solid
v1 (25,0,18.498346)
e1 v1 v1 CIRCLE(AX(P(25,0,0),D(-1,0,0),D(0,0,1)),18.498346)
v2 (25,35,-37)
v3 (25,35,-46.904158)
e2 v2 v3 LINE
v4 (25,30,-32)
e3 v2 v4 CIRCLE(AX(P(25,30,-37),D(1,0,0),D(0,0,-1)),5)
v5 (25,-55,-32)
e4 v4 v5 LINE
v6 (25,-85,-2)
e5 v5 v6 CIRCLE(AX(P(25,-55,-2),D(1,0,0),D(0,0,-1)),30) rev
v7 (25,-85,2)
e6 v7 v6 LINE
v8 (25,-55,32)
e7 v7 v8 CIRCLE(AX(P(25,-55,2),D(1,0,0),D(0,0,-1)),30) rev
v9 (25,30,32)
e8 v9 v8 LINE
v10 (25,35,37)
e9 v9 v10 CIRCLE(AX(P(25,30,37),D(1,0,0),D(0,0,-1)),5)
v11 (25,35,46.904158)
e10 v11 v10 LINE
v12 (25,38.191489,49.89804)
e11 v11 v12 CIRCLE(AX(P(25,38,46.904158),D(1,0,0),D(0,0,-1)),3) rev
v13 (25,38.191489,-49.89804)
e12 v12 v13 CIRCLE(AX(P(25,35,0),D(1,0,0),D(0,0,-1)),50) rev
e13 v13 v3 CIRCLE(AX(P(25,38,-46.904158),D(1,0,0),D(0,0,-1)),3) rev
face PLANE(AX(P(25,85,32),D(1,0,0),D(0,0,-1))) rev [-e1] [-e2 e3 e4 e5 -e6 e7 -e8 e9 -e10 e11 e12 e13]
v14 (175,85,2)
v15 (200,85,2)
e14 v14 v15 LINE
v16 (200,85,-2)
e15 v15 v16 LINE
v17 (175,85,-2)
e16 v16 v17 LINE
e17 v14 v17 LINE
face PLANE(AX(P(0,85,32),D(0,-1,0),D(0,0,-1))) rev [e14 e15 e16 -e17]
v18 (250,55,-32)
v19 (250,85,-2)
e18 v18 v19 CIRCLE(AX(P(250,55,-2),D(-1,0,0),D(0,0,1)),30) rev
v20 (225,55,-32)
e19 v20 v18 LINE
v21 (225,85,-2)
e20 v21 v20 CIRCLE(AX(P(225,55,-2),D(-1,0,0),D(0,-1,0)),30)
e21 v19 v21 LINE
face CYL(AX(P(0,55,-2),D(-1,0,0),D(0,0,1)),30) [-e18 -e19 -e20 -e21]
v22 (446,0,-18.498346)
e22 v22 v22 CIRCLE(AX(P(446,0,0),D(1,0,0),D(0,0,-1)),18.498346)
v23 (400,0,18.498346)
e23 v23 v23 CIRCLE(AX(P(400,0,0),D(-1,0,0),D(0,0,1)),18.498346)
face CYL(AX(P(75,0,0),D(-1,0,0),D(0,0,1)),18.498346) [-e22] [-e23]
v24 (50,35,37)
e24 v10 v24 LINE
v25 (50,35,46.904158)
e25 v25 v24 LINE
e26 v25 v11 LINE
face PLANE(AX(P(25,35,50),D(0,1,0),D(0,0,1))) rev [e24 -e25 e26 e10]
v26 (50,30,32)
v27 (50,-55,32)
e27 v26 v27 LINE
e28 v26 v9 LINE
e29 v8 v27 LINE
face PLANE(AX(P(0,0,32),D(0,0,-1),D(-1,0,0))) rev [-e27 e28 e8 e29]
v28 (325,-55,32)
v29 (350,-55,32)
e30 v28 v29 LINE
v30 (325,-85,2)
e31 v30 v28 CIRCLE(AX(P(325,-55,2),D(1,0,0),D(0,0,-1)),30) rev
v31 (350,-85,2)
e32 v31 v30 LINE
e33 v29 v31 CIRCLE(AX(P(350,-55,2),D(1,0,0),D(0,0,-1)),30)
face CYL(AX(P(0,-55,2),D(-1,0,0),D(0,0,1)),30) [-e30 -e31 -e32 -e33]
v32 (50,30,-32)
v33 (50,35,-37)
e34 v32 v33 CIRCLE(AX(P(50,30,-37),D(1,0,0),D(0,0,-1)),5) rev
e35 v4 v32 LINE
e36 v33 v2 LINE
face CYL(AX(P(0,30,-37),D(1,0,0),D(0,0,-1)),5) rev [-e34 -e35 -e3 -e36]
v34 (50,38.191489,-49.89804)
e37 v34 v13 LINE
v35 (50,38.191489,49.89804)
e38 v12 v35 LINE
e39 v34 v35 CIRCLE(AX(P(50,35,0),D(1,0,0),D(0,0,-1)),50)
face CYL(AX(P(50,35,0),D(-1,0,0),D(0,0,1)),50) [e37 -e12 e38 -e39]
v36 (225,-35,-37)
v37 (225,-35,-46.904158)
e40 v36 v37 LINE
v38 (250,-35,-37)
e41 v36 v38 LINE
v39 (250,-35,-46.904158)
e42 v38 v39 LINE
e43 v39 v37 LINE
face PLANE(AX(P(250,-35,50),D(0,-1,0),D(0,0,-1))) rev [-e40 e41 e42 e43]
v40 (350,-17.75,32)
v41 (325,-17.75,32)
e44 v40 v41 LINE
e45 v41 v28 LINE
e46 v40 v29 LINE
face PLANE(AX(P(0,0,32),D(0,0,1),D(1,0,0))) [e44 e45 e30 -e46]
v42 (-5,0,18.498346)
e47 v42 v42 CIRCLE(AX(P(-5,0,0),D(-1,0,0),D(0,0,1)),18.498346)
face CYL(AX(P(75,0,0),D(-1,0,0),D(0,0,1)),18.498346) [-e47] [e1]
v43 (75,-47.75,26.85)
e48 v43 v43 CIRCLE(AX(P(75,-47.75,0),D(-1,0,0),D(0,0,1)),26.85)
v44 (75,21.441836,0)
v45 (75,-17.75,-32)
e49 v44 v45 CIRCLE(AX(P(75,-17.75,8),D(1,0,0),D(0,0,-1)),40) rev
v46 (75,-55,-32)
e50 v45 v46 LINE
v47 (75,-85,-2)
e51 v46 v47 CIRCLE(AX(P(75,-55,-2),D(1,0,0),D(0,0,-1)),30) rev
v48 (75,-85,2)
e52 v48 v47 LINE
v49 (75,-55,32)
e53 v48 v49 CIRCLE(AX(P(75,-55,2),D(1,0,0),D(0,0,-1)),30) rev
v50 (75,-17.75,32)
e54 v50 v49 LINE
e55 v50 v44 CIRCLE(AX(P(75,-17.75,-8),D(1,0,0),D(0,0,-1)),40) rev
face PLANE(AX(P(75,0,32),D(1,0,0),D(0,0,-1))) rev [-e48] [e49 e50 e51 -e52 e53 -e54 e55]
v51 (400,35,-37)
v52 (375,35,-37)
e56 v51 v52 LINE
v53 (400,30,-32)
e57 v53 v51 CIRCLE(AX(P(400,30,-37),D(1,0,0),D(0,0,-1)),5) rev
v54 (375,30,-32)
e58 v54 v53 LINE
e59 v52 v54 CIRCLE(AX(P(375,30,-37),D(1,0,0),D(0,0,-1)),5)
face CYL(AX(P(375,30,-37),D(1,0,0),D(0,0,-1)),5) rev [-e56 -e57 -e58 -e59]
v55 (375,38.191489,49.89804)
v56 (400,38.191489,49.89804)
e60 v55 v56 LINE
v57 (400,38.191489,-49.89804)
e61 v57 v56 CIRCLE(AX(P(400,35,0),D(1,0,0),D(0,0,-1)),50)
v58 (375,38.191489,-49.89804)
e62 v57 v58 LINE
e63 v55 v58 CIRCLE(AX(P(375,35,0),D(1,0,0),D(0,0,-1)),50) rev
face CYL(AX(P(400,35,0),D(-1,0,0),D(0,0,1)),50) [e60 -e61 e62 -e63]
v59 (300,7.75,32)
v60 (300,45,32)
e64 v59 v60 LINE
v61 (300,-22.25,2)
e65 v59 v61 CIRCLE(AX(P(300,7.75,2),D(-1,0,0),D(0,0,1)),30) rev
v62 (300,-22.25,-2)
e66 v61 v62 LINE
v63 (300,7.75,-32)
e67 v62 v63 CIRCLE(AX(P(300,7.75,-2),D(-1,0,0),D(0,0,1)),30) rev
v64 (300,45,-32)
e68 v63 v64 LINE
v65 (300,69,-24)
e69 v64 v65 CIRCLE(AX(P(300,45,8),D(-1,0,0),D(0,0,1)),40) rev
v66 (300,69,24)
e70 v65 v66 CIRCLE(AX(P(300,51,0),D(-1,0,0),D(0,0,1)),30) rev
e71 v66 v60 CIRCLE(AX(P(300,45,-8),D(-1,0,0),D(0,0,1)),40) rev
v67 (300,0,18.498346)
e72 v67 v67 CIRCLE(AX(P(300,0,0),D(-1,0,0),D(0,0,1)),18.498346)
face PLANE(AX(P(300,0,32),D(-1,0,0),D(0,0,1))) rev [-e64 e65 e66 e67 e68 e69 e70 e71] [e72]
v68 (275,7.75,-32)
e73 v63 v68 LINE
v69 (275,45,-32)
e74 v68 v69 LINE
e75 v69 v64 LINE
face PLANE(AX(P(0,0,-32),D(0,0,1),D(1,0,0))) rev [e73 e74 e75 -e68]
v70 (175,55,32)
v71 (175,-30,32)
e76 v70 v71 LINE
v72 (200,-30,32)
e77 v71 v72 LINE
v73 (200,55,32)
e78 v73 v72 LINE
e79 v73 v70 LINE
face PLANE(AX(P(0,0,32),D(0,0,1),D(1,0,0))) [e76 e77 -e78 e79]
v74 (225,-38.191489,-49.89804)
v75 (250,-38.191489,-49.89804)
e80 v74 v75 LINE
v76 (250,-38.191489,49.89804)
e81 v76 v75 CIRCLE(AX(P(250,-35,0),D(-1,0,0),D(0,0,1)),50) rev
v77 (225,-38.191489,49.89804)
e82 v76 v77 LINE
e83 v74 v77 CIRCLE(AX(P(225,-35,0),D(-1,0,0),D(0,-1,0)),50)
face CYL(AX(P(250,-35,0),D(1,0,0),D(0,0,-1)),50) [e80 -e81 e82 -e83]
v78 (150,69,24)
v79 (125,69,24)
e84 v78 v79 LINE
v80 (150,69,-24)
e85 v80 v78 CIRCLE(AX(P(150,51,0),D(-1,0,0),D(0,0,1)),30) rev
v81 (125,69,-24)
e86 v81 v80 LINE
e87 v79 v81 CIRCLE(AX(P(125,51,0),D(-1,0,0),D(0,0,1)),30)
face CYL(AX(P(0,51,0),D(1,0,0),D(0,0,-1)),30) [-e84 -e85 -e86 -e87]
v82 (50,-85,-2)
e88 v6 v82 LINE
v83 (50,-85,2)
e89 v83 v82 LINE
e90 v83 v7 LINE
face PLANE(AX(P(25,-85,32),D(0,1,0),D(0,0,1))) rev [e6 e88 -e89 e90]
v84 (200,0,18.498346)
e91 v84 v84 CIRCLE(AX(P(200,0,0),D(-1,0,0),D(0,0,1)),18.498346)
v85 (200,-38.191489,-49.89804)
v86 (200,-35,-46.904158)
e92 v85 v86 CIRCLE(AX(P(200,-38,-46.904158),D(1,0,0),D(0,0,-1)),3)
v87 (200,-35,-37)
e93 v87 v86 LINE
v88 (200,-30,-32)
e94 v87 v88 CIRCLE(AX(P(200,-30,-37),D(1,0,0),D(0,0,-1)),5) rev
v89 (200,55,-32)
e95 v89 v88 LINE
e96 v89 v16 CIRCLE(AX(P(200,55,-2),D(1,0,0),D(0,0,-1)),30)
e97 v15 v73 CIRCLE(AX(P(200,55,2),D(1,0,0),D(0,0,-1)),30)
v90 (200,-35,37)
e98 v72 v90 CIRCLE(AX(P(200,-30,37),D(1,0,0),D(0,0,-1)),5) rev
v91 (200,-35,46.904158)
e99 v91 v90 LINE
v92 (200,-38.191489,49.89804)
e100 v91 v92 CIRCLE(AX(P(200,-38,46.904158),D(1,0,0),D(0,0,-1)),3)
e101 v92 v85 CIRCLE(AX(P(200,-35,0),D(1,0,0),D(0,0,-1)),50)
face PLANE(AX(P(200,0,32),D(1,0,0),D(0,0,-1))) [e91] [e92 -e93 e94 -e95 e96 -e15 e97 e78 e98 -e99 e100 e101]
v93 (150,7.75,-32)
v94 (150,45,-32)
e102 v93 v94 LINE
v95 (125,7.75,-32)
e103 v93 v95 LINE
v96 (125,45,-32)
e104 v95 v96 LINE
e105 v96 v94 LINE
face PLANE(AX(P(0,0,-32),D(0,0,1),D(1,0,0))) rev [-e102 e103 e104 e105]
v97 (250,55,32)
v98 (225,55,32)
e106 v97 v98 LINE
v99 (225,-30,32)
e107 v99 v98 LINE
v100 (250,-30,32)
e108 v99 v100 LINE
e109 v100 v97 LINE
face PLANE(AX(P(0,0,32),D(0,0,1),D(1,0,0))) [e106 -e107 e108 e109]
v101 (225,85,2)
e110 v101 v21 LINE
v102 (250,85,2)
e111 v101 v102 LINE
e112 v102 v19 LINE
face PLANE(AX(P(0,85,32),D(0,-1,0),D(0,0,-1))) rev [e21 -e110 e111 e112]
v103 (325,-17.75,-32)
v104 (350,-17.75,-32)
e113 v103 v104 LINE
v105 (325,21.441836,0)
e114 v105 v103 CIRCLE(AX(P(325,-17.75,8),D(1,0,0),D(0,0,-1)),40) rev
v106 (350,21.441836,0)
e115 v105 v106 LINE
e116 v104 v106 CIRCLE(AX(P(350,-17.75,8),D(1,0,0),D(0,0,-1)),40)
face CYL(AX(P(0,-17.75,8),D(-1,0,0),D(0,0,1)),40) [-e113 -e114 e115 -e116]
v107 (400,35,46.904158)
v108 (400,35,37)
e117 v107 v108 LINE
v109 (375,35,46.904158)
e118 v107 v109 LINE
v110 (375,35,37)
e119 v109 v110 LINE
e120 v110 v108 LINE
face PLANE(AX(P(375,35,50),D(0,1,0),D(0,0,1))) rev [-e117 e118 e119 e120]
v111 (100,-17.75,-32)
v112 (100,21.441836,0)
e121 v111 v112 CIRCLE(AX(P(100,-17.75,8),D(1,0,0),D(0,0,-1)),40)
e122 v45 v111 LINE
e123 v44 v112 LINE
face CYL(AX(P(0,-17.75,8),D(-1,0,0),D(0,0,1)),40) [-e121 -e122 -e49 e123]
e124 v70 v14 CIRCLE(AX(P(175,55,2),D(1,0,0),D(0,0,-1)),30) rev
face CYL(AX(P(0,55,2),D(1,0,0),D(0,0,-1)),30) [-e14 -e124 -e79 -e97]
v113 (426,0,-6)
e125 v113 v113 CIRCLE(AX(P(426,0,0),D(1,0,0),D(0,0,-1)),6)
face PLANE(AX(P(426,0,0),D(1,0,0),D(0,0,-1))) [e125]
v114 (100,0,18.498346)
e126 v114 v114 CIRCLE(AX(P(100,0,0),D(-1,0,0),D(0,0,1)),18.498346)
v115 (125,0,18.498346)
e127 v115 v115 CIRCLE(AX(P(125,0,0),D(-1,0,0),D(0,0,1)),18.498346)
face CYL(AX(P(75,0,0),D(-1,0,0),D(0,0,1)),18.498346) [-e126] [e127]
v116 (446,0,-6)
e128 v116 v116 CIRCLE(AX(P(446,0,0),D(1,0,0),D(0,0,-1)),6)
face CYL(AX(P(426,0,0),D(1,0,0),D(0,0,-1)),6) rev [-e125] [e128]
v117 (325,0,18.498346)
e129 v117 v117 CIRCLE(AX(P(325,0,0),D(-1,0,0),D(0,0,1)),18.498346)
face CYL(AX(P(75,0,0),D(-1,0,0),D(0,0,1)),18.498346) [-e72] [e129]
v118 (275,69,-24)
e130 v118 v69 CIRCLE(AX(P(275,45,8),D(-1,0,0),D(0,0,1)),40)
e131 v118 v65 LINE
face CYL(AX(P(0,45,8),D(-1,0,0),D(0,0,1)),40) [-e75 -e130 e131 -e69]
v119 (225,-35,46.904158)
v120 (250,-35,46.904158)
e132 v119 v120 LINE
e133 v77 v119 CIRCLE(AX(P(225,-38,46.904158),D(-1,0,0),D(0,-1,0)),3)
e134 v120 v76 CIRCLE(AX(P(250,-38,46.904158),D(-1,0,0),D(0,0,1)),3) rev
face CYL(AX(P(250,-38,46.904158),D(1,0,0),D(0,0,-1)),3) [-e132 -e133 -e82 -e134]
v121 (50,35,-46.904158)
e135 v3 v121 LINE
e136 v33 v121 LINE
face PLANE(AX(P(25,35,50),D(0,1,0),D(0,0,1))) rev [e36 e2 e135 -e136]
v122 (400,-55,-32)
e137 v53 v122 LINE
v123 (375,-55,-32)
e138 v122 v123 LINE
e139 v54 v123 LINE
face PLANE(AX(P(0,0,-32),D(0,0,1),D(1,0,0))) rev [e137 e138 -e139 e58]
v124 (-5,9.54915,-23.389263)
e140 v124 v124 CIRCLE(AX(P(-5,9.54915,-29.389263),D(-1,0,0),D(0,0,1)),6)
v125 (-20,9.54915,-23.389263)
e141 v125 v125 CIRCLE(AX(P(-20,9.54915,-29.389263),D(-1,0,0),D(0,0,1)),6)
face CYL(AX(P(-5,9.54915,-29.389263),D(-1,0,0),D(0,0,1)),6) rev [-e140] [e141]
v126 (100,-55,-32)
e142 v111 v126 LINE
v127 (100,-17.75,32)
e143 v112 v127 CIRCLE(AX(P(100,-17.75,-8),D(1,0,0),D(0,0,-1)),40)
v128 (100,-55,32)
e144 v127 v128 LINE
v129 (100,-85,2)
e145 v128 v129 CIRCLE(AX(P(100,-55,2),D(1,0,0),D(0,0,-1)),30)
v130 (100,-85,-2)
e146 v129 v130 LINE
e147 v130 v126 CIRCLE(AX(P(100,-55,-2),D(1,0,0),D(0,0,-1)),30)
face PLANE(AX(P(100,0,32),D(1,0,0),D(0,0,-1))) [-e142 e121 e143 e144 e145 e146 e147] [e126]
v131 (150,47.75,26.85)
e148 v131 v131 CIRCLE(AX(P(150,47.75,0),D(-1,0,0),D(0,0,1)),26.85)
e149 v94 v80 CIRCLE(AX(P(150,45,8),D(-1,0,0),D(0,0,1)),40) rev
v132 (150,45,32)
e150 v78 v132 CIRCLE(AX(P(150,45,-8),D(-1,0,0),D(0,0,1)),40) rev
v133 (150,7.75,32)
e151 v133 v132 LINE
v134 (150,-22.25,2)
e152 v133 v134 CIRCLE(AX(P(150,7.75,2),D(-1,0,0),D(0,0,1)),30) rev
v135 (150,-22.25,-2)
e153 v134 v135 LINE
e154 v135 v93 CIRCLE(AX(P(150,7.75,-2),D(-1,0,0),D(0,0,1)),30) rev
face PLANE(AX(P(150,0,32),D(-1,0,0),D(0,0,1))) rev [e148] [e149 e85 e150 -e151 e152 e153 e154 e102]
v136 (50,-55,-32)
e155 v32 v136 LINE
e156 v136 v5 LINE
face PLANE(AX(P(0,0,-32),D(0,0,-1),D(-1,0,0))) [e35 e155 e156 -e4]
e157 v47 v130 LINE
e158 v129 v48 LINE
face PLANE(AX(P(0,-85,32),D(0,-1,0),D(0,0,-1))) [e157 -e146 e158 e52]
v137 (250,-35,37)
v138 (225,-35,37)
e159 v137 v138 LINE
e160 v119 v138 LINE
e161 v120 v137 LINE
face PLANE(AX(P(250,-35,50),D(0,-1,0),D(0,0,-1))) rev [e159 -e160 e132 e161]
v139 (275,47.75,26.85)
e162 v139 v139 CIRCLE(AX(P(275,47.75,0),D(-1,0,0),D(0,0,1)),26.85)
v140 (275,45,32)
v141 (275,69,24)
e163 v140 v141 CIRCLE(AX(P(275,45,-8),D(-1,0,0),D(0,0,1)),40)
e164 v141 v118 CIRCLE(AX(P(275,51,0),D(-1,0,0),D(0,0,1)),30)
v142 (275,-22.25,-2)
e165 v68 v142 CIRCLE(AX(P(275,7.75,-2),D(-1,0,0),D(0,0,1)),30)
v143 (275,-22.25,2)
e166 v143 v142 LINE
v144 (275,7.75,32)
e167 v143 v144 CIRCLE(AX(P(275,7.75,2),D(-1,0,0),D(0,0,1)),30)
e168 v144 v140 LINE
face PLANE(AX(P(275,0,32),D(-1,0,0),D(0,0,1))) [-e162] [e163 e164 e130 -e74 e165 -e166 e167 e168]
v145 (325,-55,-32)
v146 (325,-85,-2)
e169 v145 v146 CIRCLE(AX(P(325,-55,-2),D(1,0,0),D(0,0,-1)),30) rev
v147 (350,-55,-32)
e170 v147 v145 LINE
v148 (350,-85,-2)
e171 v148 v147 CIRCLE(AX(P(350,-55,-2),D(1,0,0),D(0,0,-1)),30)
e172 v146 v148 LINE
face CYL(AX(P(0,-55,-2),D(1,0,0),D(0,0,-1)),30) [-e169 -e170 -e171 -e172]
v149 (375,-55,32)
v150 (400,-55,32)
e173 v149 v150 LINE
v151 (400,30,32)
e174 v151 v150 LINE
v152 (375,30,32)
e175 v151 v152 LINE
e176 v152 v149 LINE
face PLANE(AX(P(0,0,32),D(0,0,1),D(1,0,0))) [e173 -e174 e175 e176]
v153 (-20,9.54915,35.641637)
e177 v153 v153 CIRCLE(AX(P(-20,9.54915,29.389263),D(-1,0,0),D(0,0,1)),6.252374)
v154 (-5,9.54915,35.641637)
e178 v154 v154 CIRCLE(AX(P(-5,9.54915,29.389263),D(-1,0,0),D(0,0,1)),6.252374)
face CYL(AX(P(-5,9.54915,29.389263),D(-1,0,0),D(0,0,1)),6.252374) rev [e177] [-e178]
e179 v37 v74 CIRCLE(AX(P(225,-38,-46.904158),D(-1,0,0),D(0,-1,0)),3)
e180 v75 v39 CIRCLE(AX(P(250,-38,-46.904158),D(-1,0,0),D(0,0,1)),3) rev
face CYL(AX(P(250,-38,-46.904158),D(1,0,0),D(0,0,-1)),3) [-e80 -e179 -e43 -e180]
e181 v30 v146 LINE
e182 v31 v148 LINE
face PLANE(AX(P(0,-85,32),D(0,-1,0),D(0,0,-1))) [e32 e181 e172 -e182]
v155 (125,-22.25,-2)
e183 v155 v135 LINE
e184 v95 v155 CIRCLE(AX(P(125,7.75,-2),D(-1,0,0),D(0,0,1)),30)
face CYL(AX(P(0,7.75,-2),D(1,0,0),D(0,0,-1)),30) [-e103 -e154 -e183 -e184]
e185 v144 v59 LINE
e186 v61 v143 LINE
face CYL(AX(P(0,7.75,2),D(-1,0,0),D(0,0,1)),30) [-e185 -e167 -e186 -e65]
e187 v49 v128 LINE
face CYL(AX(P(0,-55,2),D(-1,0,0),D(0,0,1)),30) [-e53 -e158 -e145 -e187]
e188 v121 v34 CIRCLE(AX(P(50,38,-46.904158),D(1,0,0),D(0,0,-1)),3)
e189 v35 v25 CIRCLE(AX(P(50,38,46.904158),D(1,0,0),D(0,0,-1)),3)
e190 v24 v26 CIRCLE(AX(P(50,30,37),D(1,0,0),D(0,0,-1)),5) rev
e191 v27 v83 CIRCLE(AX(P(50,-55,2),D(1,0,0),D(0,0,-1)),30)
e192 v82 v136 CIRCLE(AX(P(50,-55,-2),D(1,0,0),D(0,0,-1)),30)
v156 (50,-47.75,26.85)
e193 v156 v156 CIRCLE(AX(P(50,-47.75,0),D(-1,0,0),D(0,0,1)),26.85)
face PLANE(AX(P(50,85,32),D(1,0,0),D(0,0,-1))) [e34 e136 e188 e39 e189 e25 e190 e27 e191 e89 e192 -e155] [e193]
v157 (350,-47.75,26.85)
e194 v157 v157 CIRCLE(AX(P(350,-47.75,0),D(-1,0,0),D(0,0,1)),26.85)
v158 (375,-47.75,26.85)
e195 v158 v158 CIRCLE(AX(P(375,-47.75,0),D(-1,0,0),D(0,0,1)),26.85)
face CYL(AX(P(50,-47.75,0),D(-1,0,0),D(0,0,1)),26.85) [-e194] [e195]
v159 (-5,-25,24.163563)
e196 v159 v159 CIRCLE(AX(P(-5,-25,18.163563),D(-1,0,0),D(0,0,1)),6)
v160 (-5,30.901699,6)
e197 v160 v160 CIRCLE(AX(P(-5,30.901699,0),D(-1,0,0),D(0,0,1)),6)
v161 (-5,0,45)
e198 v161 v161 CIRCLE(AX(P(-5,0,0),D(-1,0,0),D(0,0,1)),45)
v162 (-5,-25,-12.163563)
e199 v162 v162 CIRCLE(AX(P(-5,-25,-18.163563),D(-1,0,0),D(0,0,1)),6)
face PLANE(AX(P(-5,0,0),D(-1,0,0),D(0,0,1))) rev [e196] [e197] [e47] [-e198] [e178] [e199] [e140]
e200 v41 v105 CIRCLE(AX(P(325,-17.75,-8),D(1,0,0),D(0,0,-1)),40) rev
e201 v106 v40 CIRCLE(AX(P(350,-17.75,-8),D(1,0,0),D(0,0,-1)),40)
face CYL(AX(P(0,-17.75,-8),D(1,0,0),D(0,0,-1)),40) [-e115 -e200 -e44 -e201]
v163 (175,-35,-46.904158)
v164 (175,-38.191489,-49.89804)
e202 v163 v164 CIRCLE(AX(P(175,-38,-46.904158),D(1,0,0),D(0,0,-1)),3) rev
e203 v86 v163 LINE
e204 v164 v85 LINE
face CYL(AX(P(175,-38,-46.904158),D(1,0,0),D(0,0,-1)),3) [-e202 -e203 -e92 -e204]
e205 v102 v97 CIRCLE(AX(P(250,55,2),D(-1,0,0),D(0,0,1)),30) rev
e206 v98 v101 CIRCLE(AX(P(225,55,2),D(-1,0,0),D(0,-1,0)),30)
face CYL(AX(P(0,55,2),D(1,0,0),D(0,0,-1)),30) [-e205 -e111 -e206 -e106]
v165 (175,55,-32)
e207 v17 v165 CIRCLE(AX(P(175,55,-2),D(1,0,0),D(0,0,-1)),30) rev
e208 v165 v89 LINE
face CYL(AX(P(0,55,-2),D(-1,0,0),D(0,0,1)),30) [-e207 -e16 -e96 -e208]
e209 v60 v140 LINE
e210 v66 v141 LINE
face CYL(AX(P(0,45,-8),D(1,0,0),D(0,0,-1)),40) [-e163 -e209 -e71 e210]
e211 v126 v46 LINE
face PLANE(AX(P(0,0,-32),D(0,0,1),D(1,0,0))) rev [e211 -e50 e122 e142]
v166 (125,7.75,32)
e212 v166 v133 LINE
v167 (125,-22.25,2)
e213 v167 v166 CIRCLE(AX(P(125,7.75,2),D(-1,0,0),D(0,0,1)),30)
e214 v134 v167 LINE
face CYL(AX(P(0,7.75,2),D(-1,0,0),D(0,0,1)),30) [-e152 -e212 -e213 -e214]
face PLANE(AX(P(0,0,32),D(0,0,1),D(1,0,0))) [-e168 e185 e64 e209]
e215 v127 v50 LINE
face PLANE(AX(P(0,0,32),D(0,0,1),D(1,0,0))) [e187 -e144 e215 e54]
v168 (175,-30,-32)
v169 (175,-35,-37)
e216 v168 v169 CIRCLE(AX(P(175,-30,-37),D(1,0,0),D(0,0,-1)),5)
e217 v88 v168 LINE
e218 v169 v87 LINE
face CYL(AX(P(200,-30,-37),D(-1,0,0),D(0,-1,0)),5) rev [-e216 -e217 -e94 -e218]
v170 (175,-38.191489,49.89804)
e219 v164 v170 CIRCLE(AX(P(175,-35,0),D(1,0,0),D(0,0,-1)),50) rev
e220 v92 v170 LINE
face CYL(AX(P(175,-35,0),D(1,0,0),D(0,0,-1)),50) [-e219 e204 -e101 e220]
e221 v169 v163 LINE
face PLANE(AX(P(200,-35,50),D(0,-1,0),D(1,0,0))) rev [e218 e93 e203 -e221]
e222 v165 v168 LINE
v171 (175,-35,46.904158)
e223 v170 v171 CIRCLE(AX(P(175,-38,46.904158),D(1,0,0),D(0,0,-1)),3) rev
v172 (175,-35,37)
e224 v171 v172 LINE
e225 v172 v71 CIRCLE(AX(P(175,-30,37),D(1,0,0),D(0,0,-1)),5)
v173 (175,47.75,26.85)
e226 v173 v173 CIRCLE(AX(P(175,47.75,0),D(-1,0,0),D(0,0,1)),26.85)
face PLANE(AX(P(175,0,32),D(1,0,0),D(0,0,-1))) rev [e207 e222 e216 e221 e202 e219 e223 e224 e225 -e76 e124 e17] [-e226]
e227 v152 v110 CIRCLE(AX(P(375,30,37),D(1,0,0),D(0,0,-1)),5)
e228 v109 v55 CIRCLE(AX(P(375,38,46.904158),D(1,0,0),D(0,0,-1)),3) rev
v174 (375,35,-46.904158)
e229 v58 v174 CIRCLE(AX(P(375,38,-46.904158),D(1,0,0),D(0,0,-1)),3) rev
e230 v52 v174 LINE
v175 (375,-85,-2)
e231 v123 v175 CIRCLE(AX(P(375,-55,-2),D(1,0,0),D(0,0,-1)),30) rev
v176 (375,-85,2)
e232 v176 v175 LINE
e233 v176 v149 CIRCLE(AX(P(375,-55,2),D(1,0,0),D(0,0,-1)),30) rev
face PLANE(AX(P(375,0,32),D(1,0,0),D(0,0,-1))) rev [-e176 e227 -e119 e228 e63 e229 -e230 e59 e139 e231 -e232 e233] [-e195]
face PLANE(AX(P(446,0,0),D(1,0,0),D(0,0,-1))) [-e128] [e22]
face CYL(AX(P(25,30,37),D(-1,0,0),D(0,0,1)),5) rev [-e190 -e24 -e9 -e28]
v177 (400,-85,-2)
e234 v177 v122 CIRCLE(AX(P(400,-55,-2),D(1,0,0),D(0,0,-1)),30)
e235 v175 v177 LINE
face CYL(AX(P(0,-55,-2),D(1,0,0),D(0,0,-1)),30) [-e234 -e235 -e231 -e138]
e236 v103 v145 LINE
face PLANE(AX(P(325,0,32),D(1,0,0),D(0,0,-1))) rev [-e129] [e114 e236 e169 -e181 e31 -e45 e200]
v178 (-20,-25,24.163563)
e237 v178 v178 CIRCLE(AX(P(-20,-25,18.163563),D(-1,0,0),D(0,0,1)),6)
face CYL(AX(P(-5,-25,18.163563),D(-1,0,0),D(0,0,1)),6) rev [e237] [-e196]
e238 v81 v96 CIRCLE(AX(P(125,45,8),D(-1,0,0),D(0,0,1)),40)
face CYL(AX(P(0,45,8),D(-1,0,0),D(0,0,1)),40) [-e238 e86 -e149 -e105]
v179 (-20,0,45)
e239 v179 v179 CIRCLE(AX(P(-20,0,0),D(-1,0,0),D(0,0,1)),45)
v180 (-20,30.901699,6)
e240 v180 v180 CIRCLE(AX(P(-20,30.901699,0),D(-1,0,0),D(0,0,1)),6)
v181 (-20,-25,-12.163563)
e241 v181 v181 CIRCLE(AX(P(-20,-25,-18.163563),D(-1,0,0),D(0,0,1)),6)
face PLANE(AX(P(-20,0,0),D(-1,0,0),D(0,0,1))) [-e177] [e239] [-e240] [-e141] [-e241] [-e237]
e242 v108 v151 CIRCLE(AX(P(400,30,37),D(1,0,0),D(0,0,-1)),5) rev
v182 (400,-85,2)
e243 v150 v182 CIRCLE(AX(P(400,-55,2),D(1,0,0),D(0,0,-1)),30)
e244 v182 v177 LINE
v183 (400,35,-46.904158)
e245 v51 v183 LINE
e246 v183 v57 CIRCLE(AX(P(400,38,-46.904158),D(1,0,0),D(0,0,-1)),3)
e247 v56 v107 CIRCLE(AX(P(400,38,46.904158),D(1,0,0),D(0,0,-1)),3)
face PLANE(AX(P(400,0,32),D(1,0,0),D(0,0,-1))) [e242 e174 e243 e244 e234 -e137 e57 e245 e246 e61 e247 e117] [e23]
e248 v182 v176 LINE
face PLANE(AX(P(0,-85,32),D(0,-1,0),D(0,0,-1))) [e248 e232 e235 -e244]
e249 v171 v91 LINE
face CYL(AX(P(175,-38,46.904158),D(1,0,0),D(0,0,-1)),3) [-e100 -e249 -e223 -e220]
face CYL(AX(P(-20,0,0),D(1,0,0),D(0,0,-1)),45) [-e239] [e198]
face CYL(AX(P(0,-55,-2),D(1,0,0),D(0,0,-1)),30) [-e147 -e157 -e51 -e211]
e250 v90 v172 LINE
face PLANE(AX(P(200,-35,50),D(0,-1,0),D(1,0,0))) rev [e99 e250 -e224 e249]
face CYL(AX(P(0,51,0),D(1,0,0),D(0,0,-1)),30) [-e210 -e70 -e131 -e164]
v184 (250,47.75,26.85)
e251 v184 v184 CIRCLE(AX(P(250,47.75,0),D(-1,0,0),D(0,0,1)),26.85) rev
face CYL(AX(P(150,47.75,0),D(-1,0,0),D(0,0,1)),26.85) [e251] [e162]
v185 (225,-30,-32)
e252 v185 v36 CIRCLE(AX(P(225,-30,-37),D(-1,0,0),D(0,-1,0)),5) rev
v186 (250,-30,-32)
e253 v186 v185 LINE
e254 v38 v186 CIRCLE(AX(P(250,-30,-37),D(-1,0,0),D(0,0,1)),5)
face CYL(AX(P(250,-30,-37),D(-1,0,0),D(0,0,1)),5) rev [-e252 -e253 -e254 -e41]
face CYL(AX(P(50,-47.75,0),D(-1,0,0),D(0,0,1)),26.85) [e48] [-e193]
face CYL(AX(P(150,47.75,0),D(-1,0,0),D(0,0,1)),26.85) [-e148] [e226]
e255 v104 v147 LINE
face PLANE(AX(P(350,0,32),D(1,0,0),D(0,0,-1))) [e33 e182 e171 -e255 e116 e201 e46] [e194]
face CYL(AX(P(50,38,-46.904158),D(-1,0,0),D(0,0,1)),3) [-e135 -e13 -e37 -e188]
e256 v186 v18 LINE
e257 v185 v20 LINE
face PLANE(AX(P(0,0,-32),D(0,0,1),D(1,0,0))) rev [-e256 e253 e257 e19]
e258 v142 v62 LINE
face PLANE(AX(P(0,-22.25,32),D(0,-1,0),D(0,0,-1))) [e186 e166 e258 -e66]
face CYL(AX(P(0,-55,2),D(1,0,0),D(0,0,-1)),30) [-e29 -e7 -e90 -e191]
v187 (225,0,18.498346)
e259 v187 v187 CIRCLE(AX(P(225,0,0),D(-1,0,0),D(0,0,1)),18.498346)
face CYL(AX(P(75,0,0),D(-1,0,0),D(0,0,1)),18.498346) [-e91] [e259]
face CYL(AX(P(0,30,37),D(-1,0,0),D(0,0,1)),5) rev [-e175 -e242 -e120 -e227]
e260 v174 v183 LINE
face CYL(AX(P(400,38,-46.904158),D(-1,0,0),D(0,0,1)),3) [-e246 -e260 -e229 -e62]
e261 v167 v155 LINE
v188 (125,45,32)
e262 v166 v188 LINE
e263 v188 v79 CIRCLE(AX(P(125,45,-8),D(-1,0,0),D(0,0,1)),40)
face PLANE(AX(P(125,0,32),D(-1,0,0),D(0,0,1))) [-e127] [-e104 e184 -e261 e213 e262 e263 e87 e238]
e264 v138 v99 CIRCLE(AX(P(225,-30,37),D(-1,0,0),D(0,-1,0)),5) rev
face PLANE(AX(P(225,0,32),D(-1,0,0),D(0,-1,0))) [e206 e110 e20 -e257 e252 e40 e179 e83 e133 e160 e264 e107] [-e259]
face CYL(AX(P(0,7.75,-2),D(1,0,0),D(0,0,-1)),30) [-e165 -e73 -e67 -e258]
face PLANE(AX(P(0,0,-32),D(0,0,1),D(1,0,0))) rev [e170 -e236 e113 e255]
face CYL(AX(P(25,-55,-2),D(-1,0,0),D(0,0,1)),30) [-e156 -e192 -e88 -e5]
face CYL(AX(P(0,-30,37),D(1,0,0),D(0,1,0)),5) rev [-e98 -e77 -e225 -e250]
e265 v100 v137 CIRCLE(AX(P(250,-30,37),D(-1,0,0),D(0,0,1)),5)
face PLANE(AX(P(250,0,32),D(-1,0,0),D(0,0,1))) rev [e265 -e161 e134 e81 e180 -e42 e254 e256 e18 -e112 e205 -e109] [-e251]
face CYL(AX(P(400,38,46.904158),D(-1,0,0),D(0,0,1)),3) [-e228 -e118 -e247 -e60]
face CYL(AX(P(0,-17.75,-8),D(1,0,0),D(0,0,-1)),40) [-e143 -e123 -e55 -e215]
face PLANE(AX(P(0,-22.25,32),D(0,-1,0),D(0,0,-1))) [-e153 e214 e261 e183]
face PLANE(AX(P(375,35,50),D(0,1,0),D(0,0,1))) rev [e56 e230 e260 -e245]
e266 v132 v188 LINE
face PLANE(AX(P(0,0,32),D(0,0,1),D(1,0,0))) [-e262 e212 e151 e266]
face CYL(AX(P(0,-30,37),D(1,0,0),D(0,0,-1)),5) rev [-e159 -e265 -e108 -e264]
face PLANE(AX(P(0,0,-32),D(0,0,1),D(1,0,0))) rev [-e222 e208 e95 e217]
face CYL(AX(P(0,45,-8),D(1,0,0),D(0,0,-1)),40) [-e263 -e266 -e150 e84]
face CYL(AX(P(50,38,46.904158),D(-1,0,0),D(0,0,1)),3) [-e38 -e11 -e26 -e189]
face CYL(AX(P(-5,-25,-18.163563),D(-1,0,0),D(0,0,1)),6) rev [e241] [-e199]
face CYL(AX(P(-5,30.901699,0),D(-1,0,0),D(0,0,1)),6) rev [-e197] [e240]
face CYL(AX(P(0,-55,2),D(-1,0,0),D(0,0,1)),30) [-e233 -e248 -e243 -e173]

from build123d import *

# Parameters (mm, degrees)
SKETCH1_W           = 25
SKETCH1_H           = 26.85
SKETCH1_5_W         = 25
SKETCH1_5_H         = 26.85
SKETCH1_8_W         = 25
SKETCH1_8_H         = 18.498346322
SKETCH1_9_W         = 25
SKETCH1_9_H         = 170
SKETCH1_9_H_2       = 107.25
BOSS_EXTRUDE1_DEPTH = 32
FILLET1_R           = 30
FILLET3_R           = 40
SKETCH2_W           = 25
SKETCH2_H           = 50
BOSS_EXTRUDE2_DEPTH = 50
FILLET12_R          = 50
FILLET13_R          = 50
FILLET14_R          = 50
FILLET15_R          = 50
FILLET16_R          = 30
FILLET17_R          = 3
FILLET18_R          = 5
SKETCH3_R           = 18.498346322
BOSS_EXTRUDE3_DEPTH = 21
BOSS_EXTRUDE4_START = 5
SKETCH4_R           = 18.498346322
BOSS_EXTRUDE4_DEPTH = 5
SKETCH5_R           = 45
BOSS_EXTRUDE5_DEPTH = 15
CUT_EXTRUDE1_DEPTH  = 15
SKETCH7_R           = 6
CUT_EXTRUDE2_DEPTH  = 20


# Some blends are built 0.0001 mm under size
with BuildPart() as part:
    # Sketch1 → Revolve1 (revolve)
    with BuildSketch(Plane.XY, mode=Mode.PRIVATE) as revolve1_sk:
        with Locations((162.5, 61.175)):
            Rectangle(SKETCH1_W, SKETCH1_H)
        with Locations((262.5, 61.175)):
            Rectangle(SKETCH1_W, SKETCH1_H)
    revolve(revolve1_sk.sketch.rotate(Axis((150, 47.75, 0), (1, 0, 0)), 90), axis=Axis((150, 47.75, 0), (1, 0, 0)))



with BuildPart() as body_2:
    # Sketch1<5> → Revolve3 (revolve)
    with BuildSketch(Plane.XY, mode=Mode.PRIVATE) as revolve3_sk:
        with Locations((62.5, -34.325)):
            Rectangle(SKETCH1_5_W, SKETCH1_5_H)
        with Locations((362.5, -34.325)):
            Rectangle(SKETCH1_5_W, SKETCH1_5_H)
    revolve(revolve3_sk.sketch.rotate(Axis((50, -47.75, 0), (1, 0, 0)), 90), axis=Axis((50, -47.75, 0), (1, 0, 0)))


with BuildPart() as body_3:
    # Sketch1<8> → Revolve4 (revolve)
    with BuildSketch(Plane.XY, mode=Mode.PRIVATE) as revolve4_sk:
        with Locations((12.5, 9.249173161)):
            Rectangle(SKETCH1_8_W, SKETCH1_8_H)
        with Locations((112.5, 9.249173161)):
            Rectangle(SKETCH1_8_W, SKETCH1_8_H)
        with Locations((212.5, 9.249173161)):
            Rectangle(SKETCH1_8_W, SKETCH1_8_H)
        with Locations((312.5, 9.249173161)):
            Rectangle(SKETCH1_8_W, SKETCH1_8_H)
        with Locations((412.5, 9.249173161)):
            Rectangle(SKETCH1_8_W, SKETCH1_8_H)
    revolve(revolve4_sk.sketch.rotate(Axis((75, 0, 0), (1, 0, 0)), 90), axis=Axis((75, 0, 0), (1, 0, 0)))


with BuildPart() as part_1:
    add(part.part)

    add(body_2.part)  # Boss-Extrude1 merges body 2

    add(body_3.part)  # Boss-Extrude1 merges body 3
    # Sketch1<9> → Boss-Extrude1 (add, symmetric)
    with BuildSketch(Plane.XY):
        with Locations((37.5, 0)):
            Rectangle(SKETCH1_9_W, SKETCH1_9_H)
        with Locations((87.5, -31.375)):
            Rectangle(SKETCH1_9_W, SKETCH1_9_H_2)
        with Locations((187.5, 0)):
            Rectangle(SKETCH1_9_W, SKETCH1_9_H)
        with Locations((137.5, 31.375)):
            Rectangle(SKETCH1_9_W, SKETCH1_9_H_2)
        with Locations((237.5, 0)):
            Rectangle(SKETCH1_9_W, SKETCH1_9_H)
        with Locations((337.5, -31.375)):
            Rectangle(SKETCH1_9_W, SKETCH1_9_H_2)
        with Locations((287.5, 31.375)):
            Rectangle(SKETCH1_9_W, SKETCH1_9_H_2)
        with Locations((387.5, 0)):
            Rectangle(SKETCH1_9_W, SKETCH1_9_H)
    extrude(amount=BOSS_EXTRUDE1_DEPTH, both=True)

    # Fillet1
    fillet1_edges = [part_1.edges().sort_by_distance(p)[0] for p in [
        (37.5, -85, -32),
        (37.5, -85, 32),
        (137.5, -22.25, 32),
        (137.5, -22.25, -32),
        (87.5, -85, 32),
        (87.5, -85, -32),
        (187.5, 85, -32),
        (187.5, 85, 32),
        (237.5, 85, -32),
        (237.5, 85, 32),
        (287.5, -22.25, 32),
        (287.5, -22.25, -32),
        (337.5, -85, 32),
        (337.5, -85, -32),
        (387.5, -85, 32),
        (387.5, -85, -32),
    ]]
    fillet(fillet1_edges, radius=FILLET1_R)

    # Fillet3
    # the kernel refuses this fillet: 40 mm, written as the material it takes off along each edge
    with BuildSketch(Plane(origin=(400, 85, -32), x_dir=(0, -1, 0), z_dir=(-1, 0, 0))) as fillet3_piece_1_section:
        with BuildLine():
            CenterArc((FILLET3_R, FILLET3_R), FILLET3_R, 180, 90)
            Line((0, FILLET3_R), (0, 0))
            Line((0, 0), (FILLET3_R, 0))
        make_face()
    fillet3_piece_1 = extrude(amount=125, mode=Mode.PRIVATE)
    fillet3_piece_1 = split(fillet3_piece_1, bisect_by=Plane(origin=(375, 50.180054466, -31.891838311), z_dir=(-1, 0, 0)), keep=Keep.TOP, mode=Mode.PRIVATE)
    add(fillet3_piece_1, mode=Mode.SUBTRACT)
    with BuildSketch(Plane(origin=(400, 85, 32), x_dir=(0, 0, -1), z_dir=(-1, 0, 0))) as fillet3_piece_2_section:
        with BuildLine():
            CenterArc((FILLET3_R, FILLET3_R), FILLET3_R, 180, 90)
            Line((0, FILLET3_R), (0, 0))
            Line((0, 0), (FILLET3_R, 0))
        make_face()
    fillet3_piece_2 = extrude(amount=125, mode=Mode.PRIVATE)
    fillet3_piece_2 = split(fillet3_piece_2, bisect_by=Plane(origin=(375, 84.961169629, -4.892183964), z_dir=(-1, 0, 0)), keep=Keep.TOP, mode=Mode.PRIVATE)
    add(fillet3_piece_2, mode=Mode.SUBTRACT)
    with BuildSketch(Plane(origin=(250, 85, -32), x_dir=(0, -1, 0), z_dir=(-1, 0, 0))) as fillet3_piece_3_section:
        with BuildLine():
            CenterArc((FILLET3_R, FILLET3_R), FILLET3_R, 180, 90)
            Line((0, FILLET3_R), (0, 0))
            Line((0, 0), (FILLET3_R, 0))
        make_face()
    fillet3_piece_3 = extrude(amount=125, mode=Mode.PRIVATE)
    fillet3_piece_3 = split(fillet3_piece_3, bisect_by=Plane(origin=(175, 50.180054466, -31.891838311), z_dir=(-1, 0, 0)), keep=Keep.TOP, mode=Mode.PRIVATE)
    add(fillet3_piece_3, mode=Mode.SUBTRACT)
    with BuildSketch(Plane(origin=(250, 85, 32), x_dir=(0, 0, -1), z_dir=(-1, 0, 0))) as fillet3_piece_4_section:
        with BuildLine():
            CenterArc((FILLET3_R, FILLET3_R), FILLET3_R, 180, 90)
            Line((0, FILLET3_R), (0, 0))
            Line((0, 0), (FILLET3_R, 0))
        make_face()
    fillet3_piece_4 = extrude(amount=125, mode=Mode.PRIVATE)
    fillet3_piece_4 = split(fillet3_piece_4, bisect_by=Plane(origin=(175, 84.961169629, -4.892183964), z_dir=(-1, 0, 0)), keep=Keep.TOP, mode=Mode.PRIVATE)
    add(fillet3_piece_4, mode=Mode.SUBTRACT)
    with BuildSketch(Plane(origin=(450, 22.25, -32), x_dir=(0, -1, 0), z_dir=(-1, 0, 0))) as fillet3_piece_5_section:
        with BuildLine():
            CenterArc((FILLET3_R, FILLET3_R), FILLET3_R, 180, 90)
            Line((0, FILLET3_R), (0, 0))
            Line((0, 0), (FILLET3_R, 0))
        make_face()
    fillet3_piece_5 = extrude(amount=125, mode=Mode.PRIVATE)
    fillet3_piece_5 = split(fillet3_piece_5, bisect_by=Plane(origin=(375, -4.532523645, -31.278935782), z_dir=(-1, 0, 0)), keep=Keep.TOP, mode=Mode.PRIVATE)
    add(fillet3_piece_5, mode=Mode.SUBTRACT)
    with BuildSketch(Plane(origin=(450, 22.25, 32), x_dir=(0, 0, -1), z_dir=(-1, 0, 0))) as fillet3_piece_6_section:
        with BuildLine():
            CenterArc((FILLET3_R, FILLET3_R), FILLET3_R, 180, 90)
            Line((0, FILLET3_R), (0, 0))
            Line((0, 0), (FILLET3_R, 0))
        make_face()
    fillet3_piece_6 = extrude(amount=125, mode=Mode.PRIVATE)
    fillet3_piece_6 = split(fillet3_piece_6, bisect_by=Plane(origin=(375, 21.818010891, 2.113463403), z_dir=(-1, 0, 0)), keep=Keep.TOP, mode=Mode.PRIVATE)
    add(fillet3_piece_6, mode=Mode.SUBTRACT)
    with BuildSketch(Plane(origin=(200, 22.25, -32), x_dir=(0, -1, 0), z_dir=(-1, 0, 0))) as fillet3_piece_7_section:
        with BuildLine():
            CenterArc((FILLET3_R, FILLET3_R), FILLET3_R, 180, 90)
            Line((0, FILLET3_R), (0, 0))
            Line((0, 0), (FILLET3_R, 0))
        make_face()
    fillet3_piece_7 = extrude(amount=125, mode=Mode.PRIVATE)
    fillet3_piece_7 = split(fillet3_piece_7, bisect_by=Plane(origin=(125, -4.532523645, -31.278935782), z_dir=(-1, 0, 0)), keep=Keep.TOP, mode=Mode.PRIVATE)
    add(fillet3_piece_7, mode=Mode.SUBTRACT)
    with BuildSketch(Plane(origin=(200, 22.25, 32), x_dir=(0, 0, -1), z_dir=(-1, 0, 0))) as fillet3_piece_8_section:
        with BuildLine():
            CenterArc((FILLET3_R, FILLET3_R), FILLET3_R, 180, 90)
            Line((0, FILLET3_R), (0, 0))
            Line((0, 0), (FILLET3_R, 0))
        make_face()
    fillet3_piece_8 = extrude(amount=125, mode=Mode.PRIVATE)
    fillet3_piece_8 = split(fillet3_piece_8, bisect_by=Plane(origin=(125, 21.818010891, 2.113463403), z_dir=(-1, 0, 0)), keep=Keep.TOP, mode=Mode.PRIVATE)
    add(fillet3_piece_8, mode=Mode.SUBTRACT)

    # Sketch2 → Boss-Extrude2 (add, symmetric)
    with BuildSketch(Plane.XY):
        with Locations((37.5, 60)):
            Rectangle(SKETCH2_W, SKETCH2_H)
        with Locations((187.5, -60)):
            Rectangle(SKETCH2_W, SKETCH2_H)
        with Locations((237.5, -60)):
            Rectangle(SKETCH2_W, SKETCH2_H)
        with Locations((387.5, 60)):
            Rectangle(SKETCH2_W, SKETCH2_H)
    extrude(amount=BOSS_EXTRUDE2_DEPTH, both=True)

    # Fillet12
    fillet12_edges = [part_1.edges().sort_by_distance(p)[0] for p in [
        (37.5, 85, -50),
        (37.5, 85, 50),
    ]]
    fillet(fillet12_edges, radius=FILLET12_R - 0.0001)  # a hair under: the kernel refuses the full size

    # Fillet13
    fillet13_edges = [part_1.edges().sort_by_distance(p)[0] for p in [
        (387.5, 85, -50),
        (387.5, 85, 50),
    ]]
    fillet(fillet13_edges, radius=FILLET13_R - 0.0001)  # a hair under: the kernel refuses the full size

    # Fillet14
    fillet14_edges = [part_1.edges().sort_by_distance(p)[0] for p in [
        (187.5, -85, -50),
        (187.5, -85, 50),
    ]]
    fillet(fillet14_edges, radius=FILLET14_R - 0.0001)  # a hair under: the kernel refuses the full size

    # Fillet15
    fillet15_edges = [part_1.edges().sort_by_distance(p)[0] for p in [
        (237.5, -85, -50),
        (237.5, -85, 50),
    ]]
    fillet(fillet15_edges, radius=FILLET15_R - 0.0001)  # a hair under: the kernel refuses the full size

    # Fillet16
    fillet16_edges = [part_1.edges().sort_by_distance(p)[0] for p in [
        (287.5, 84.191835885, 0),
        (137.5, 84.191835885, 0),
    ]]
    fillet(fillet16_edges, radius=FILLET16_R)

    # Fillet17
    fillet17_edges = [part_1.edges().sort_by_distance(p)[0] for p in [
        (37.5, 35, -50),
        (37.5, 35, 50),
        (187.5, -35, -50),
        (187.5, -35, 50),
        (237.5, -35, -50),
        (237.5, -35, 50),
        (387.5, 35, -50),
        (387.5, 35, 50),
    ]]
    fillet(fillet17_edges, radius=FILLET17_R)

    # Fillet18
    fillet18_edges = [part_1.edges().sort_by_distance(p)[0] for p in [
        (37.5, 35, -32),
        (387.5, 35, -32),
        (237.5, -35, -32),
        (187.5, -35, -32),
        (37.5, 35, 32),
        (187.5, -35, 32),
        (237.5, -35, 32),
        (387.5, 35, 32),
    ]]
    fillet(fillet18_edges, radius=FILLET18_R)

    # Sketch3 → Boss-Extrude3 (add)
    with BuildSketch(Plane(origin=(425, 0, 0), x_dir=(0, 0, -1), z_dir=(1, 0, 0))):
        with Locations(Location((0, 0, 0), (0, 0, 180))):
            Circle(SKETCH3_R)
    extrude(amount=BOSS_EXTRUDE3_DEPTH)

    # Sketch4 → Boss-Extrude4 (add)
    with BuildSketch(Plane.ZY.offset(BOSS_EXTRUDE4_START)):
        Circle(SKETCH4_R)
    extrude(amount=-BOSS_EXTRUDE4_DEPTH)

    # Sketch5 → Boss-Extrude5 (add)
    with BuildSketch(Plane.ZY.offset(5)):
        Circle(SKETCH5_R)
    extrude(amount=BOSS_EXTRUDE5_DEPTH)

    # Sketch6 → Cut-Extrude1 (cut)
    with BuildSketch(Plane.ZY.offset(20)):
        with BuildLine():
            ThreePointArc((-23.389262615, 9.549150281), (-23.682923517, 11.403252248), (-24.535160648, 13.075861795))
            Line((-24.535160648, 13.075861795), (-29.389262615, 9.549150281))
            Line((-29.389262615, 9.549150281), (-27.535160648, 3.842811183))
            ThreePointArc((-27.535160648, 3.842811183), (-24.535160648, 6.022438767), (-23.389262615, 9.549150281))
        make_face()
        with BuildLine():
            Line((-29.389262615, 9.549150281), (-24.535160648, 13.075861795))
            ThreePointArc((-24.535160648, 13.075861795), (-35.095601712, 11.403252248), (-27.535160648, 3.842811183))
            Line((-27.535160648, 3.842811183), (-29.389262615, 9.549150281))
        make_face()
        with BuildLine():
            Line((4.854101966, 27.374987924), (0, 30.901699437))
            Line((0, 30.901699437), (-4.854101966, 27.374987924))
            ThreePointArc((-4.854101966, 27.374987924), (0, 24.901699437), (4.854101966, 27.374987924))
        make_face()
        with BuildLine():
            Line((-4.854101966, 27.374987924), (0, 30.901699437))
            Line((0, 30.901699437), (4.854101966, 27.374987924))
            ThreePointArc((4.854101966, 27.374987924), (5.706339098, 29.047597471), (6, 30.901699437))
            ThreePointArc((6, 30.901699437), (-1.854101966, 36.608038535), (-4.854101966, 27.374987924))
        make_face()
        with BuildLine():
            ThreePointArc((35.641636605, 9.549150281), (31.321352433, 15.495511307), (24.330985801, 13.224203505))
            Line((24.330985801, 13.224203505), (29.389262615, 9.549150281))
            Line((29.389262615, 9.549150281), (27.457172796, 3.602789255))
            ThreePointArc((27.457172796, 3.602789255), (33.064315838, 4.490873468), (35.641636605, 9.549150281))
        make_face()
        with BuildLine():
            Line((29.389262615, 9.549150281), (24.330985801, 13.224203505))
            ThreePointArc((24.330985801, 13.224203505), (23.442901589, 7.617060463), (27.457172796, 3.602789255))
            Line((27.457172796, 3.602789255), (29.389262615, 9.549150281))
        make_face()
        with BuildLine():
            ThreePointArc((24.1635632, -25), (23.017665166, -21.473288486), (20.017665166, -19.293660902))
            Line((20.017665166, -19.293660902), (18.1635632, -25))
            Line((18.1635632, -25), (12.1635632, -25))
            ThreePointArc((12.1635632, -25), (18.1635632, -31), (24.1635632, -25))
        make_face()
        with BuildLine():
            Line((18.1635632, -25), (20.017665166, -19.293660902))
            ThreePointArc((20.017665166, -19.293660902), (14.636851686, -20.145898034), (12.1635632, -25))
            Line((12.1635632, -25), (18.1635632, -25))
        make_face()
        with BuildLine():
            ThreePointArc((-12.1635632, -25), (-14.636851686, -20.145898034), (-20.017665166, -19.293660902))
            Line((-20.017665166, -19.293660902), (-18.1635632, -25))
            Line((-18.1635632, -25), (-12.1635632, -25))
        make_face()
        with BuildLine():
            Line((-18.1635632, -25), (-20.017665166, -19.293660902))
            ThreePointArc((-20.017665166, -19.293660902), (-21.690274714, -29.854101966), (-12.1635632, -25))
            Line((-12.1635632, -25), (-18.1635632, -25))
        make_face()
    extrude(amount=-CUT_EXTRUDE1_DEPTH, mode=Mode.SUBTRACT)

    # Sketch7 → Cut-Extrude2 (cut)
    with BuildSketch(Plane(origin=(446, 0, 0), x_dir=(0, 0, -1), z_dir=(1, 0, 0))):
        Circle(SKETCH7_R)
    extrude(amount=-CUT_EXTRUDE2_DEPTH, mode=Mode.SUBTRACT)


solid = part_1.part
